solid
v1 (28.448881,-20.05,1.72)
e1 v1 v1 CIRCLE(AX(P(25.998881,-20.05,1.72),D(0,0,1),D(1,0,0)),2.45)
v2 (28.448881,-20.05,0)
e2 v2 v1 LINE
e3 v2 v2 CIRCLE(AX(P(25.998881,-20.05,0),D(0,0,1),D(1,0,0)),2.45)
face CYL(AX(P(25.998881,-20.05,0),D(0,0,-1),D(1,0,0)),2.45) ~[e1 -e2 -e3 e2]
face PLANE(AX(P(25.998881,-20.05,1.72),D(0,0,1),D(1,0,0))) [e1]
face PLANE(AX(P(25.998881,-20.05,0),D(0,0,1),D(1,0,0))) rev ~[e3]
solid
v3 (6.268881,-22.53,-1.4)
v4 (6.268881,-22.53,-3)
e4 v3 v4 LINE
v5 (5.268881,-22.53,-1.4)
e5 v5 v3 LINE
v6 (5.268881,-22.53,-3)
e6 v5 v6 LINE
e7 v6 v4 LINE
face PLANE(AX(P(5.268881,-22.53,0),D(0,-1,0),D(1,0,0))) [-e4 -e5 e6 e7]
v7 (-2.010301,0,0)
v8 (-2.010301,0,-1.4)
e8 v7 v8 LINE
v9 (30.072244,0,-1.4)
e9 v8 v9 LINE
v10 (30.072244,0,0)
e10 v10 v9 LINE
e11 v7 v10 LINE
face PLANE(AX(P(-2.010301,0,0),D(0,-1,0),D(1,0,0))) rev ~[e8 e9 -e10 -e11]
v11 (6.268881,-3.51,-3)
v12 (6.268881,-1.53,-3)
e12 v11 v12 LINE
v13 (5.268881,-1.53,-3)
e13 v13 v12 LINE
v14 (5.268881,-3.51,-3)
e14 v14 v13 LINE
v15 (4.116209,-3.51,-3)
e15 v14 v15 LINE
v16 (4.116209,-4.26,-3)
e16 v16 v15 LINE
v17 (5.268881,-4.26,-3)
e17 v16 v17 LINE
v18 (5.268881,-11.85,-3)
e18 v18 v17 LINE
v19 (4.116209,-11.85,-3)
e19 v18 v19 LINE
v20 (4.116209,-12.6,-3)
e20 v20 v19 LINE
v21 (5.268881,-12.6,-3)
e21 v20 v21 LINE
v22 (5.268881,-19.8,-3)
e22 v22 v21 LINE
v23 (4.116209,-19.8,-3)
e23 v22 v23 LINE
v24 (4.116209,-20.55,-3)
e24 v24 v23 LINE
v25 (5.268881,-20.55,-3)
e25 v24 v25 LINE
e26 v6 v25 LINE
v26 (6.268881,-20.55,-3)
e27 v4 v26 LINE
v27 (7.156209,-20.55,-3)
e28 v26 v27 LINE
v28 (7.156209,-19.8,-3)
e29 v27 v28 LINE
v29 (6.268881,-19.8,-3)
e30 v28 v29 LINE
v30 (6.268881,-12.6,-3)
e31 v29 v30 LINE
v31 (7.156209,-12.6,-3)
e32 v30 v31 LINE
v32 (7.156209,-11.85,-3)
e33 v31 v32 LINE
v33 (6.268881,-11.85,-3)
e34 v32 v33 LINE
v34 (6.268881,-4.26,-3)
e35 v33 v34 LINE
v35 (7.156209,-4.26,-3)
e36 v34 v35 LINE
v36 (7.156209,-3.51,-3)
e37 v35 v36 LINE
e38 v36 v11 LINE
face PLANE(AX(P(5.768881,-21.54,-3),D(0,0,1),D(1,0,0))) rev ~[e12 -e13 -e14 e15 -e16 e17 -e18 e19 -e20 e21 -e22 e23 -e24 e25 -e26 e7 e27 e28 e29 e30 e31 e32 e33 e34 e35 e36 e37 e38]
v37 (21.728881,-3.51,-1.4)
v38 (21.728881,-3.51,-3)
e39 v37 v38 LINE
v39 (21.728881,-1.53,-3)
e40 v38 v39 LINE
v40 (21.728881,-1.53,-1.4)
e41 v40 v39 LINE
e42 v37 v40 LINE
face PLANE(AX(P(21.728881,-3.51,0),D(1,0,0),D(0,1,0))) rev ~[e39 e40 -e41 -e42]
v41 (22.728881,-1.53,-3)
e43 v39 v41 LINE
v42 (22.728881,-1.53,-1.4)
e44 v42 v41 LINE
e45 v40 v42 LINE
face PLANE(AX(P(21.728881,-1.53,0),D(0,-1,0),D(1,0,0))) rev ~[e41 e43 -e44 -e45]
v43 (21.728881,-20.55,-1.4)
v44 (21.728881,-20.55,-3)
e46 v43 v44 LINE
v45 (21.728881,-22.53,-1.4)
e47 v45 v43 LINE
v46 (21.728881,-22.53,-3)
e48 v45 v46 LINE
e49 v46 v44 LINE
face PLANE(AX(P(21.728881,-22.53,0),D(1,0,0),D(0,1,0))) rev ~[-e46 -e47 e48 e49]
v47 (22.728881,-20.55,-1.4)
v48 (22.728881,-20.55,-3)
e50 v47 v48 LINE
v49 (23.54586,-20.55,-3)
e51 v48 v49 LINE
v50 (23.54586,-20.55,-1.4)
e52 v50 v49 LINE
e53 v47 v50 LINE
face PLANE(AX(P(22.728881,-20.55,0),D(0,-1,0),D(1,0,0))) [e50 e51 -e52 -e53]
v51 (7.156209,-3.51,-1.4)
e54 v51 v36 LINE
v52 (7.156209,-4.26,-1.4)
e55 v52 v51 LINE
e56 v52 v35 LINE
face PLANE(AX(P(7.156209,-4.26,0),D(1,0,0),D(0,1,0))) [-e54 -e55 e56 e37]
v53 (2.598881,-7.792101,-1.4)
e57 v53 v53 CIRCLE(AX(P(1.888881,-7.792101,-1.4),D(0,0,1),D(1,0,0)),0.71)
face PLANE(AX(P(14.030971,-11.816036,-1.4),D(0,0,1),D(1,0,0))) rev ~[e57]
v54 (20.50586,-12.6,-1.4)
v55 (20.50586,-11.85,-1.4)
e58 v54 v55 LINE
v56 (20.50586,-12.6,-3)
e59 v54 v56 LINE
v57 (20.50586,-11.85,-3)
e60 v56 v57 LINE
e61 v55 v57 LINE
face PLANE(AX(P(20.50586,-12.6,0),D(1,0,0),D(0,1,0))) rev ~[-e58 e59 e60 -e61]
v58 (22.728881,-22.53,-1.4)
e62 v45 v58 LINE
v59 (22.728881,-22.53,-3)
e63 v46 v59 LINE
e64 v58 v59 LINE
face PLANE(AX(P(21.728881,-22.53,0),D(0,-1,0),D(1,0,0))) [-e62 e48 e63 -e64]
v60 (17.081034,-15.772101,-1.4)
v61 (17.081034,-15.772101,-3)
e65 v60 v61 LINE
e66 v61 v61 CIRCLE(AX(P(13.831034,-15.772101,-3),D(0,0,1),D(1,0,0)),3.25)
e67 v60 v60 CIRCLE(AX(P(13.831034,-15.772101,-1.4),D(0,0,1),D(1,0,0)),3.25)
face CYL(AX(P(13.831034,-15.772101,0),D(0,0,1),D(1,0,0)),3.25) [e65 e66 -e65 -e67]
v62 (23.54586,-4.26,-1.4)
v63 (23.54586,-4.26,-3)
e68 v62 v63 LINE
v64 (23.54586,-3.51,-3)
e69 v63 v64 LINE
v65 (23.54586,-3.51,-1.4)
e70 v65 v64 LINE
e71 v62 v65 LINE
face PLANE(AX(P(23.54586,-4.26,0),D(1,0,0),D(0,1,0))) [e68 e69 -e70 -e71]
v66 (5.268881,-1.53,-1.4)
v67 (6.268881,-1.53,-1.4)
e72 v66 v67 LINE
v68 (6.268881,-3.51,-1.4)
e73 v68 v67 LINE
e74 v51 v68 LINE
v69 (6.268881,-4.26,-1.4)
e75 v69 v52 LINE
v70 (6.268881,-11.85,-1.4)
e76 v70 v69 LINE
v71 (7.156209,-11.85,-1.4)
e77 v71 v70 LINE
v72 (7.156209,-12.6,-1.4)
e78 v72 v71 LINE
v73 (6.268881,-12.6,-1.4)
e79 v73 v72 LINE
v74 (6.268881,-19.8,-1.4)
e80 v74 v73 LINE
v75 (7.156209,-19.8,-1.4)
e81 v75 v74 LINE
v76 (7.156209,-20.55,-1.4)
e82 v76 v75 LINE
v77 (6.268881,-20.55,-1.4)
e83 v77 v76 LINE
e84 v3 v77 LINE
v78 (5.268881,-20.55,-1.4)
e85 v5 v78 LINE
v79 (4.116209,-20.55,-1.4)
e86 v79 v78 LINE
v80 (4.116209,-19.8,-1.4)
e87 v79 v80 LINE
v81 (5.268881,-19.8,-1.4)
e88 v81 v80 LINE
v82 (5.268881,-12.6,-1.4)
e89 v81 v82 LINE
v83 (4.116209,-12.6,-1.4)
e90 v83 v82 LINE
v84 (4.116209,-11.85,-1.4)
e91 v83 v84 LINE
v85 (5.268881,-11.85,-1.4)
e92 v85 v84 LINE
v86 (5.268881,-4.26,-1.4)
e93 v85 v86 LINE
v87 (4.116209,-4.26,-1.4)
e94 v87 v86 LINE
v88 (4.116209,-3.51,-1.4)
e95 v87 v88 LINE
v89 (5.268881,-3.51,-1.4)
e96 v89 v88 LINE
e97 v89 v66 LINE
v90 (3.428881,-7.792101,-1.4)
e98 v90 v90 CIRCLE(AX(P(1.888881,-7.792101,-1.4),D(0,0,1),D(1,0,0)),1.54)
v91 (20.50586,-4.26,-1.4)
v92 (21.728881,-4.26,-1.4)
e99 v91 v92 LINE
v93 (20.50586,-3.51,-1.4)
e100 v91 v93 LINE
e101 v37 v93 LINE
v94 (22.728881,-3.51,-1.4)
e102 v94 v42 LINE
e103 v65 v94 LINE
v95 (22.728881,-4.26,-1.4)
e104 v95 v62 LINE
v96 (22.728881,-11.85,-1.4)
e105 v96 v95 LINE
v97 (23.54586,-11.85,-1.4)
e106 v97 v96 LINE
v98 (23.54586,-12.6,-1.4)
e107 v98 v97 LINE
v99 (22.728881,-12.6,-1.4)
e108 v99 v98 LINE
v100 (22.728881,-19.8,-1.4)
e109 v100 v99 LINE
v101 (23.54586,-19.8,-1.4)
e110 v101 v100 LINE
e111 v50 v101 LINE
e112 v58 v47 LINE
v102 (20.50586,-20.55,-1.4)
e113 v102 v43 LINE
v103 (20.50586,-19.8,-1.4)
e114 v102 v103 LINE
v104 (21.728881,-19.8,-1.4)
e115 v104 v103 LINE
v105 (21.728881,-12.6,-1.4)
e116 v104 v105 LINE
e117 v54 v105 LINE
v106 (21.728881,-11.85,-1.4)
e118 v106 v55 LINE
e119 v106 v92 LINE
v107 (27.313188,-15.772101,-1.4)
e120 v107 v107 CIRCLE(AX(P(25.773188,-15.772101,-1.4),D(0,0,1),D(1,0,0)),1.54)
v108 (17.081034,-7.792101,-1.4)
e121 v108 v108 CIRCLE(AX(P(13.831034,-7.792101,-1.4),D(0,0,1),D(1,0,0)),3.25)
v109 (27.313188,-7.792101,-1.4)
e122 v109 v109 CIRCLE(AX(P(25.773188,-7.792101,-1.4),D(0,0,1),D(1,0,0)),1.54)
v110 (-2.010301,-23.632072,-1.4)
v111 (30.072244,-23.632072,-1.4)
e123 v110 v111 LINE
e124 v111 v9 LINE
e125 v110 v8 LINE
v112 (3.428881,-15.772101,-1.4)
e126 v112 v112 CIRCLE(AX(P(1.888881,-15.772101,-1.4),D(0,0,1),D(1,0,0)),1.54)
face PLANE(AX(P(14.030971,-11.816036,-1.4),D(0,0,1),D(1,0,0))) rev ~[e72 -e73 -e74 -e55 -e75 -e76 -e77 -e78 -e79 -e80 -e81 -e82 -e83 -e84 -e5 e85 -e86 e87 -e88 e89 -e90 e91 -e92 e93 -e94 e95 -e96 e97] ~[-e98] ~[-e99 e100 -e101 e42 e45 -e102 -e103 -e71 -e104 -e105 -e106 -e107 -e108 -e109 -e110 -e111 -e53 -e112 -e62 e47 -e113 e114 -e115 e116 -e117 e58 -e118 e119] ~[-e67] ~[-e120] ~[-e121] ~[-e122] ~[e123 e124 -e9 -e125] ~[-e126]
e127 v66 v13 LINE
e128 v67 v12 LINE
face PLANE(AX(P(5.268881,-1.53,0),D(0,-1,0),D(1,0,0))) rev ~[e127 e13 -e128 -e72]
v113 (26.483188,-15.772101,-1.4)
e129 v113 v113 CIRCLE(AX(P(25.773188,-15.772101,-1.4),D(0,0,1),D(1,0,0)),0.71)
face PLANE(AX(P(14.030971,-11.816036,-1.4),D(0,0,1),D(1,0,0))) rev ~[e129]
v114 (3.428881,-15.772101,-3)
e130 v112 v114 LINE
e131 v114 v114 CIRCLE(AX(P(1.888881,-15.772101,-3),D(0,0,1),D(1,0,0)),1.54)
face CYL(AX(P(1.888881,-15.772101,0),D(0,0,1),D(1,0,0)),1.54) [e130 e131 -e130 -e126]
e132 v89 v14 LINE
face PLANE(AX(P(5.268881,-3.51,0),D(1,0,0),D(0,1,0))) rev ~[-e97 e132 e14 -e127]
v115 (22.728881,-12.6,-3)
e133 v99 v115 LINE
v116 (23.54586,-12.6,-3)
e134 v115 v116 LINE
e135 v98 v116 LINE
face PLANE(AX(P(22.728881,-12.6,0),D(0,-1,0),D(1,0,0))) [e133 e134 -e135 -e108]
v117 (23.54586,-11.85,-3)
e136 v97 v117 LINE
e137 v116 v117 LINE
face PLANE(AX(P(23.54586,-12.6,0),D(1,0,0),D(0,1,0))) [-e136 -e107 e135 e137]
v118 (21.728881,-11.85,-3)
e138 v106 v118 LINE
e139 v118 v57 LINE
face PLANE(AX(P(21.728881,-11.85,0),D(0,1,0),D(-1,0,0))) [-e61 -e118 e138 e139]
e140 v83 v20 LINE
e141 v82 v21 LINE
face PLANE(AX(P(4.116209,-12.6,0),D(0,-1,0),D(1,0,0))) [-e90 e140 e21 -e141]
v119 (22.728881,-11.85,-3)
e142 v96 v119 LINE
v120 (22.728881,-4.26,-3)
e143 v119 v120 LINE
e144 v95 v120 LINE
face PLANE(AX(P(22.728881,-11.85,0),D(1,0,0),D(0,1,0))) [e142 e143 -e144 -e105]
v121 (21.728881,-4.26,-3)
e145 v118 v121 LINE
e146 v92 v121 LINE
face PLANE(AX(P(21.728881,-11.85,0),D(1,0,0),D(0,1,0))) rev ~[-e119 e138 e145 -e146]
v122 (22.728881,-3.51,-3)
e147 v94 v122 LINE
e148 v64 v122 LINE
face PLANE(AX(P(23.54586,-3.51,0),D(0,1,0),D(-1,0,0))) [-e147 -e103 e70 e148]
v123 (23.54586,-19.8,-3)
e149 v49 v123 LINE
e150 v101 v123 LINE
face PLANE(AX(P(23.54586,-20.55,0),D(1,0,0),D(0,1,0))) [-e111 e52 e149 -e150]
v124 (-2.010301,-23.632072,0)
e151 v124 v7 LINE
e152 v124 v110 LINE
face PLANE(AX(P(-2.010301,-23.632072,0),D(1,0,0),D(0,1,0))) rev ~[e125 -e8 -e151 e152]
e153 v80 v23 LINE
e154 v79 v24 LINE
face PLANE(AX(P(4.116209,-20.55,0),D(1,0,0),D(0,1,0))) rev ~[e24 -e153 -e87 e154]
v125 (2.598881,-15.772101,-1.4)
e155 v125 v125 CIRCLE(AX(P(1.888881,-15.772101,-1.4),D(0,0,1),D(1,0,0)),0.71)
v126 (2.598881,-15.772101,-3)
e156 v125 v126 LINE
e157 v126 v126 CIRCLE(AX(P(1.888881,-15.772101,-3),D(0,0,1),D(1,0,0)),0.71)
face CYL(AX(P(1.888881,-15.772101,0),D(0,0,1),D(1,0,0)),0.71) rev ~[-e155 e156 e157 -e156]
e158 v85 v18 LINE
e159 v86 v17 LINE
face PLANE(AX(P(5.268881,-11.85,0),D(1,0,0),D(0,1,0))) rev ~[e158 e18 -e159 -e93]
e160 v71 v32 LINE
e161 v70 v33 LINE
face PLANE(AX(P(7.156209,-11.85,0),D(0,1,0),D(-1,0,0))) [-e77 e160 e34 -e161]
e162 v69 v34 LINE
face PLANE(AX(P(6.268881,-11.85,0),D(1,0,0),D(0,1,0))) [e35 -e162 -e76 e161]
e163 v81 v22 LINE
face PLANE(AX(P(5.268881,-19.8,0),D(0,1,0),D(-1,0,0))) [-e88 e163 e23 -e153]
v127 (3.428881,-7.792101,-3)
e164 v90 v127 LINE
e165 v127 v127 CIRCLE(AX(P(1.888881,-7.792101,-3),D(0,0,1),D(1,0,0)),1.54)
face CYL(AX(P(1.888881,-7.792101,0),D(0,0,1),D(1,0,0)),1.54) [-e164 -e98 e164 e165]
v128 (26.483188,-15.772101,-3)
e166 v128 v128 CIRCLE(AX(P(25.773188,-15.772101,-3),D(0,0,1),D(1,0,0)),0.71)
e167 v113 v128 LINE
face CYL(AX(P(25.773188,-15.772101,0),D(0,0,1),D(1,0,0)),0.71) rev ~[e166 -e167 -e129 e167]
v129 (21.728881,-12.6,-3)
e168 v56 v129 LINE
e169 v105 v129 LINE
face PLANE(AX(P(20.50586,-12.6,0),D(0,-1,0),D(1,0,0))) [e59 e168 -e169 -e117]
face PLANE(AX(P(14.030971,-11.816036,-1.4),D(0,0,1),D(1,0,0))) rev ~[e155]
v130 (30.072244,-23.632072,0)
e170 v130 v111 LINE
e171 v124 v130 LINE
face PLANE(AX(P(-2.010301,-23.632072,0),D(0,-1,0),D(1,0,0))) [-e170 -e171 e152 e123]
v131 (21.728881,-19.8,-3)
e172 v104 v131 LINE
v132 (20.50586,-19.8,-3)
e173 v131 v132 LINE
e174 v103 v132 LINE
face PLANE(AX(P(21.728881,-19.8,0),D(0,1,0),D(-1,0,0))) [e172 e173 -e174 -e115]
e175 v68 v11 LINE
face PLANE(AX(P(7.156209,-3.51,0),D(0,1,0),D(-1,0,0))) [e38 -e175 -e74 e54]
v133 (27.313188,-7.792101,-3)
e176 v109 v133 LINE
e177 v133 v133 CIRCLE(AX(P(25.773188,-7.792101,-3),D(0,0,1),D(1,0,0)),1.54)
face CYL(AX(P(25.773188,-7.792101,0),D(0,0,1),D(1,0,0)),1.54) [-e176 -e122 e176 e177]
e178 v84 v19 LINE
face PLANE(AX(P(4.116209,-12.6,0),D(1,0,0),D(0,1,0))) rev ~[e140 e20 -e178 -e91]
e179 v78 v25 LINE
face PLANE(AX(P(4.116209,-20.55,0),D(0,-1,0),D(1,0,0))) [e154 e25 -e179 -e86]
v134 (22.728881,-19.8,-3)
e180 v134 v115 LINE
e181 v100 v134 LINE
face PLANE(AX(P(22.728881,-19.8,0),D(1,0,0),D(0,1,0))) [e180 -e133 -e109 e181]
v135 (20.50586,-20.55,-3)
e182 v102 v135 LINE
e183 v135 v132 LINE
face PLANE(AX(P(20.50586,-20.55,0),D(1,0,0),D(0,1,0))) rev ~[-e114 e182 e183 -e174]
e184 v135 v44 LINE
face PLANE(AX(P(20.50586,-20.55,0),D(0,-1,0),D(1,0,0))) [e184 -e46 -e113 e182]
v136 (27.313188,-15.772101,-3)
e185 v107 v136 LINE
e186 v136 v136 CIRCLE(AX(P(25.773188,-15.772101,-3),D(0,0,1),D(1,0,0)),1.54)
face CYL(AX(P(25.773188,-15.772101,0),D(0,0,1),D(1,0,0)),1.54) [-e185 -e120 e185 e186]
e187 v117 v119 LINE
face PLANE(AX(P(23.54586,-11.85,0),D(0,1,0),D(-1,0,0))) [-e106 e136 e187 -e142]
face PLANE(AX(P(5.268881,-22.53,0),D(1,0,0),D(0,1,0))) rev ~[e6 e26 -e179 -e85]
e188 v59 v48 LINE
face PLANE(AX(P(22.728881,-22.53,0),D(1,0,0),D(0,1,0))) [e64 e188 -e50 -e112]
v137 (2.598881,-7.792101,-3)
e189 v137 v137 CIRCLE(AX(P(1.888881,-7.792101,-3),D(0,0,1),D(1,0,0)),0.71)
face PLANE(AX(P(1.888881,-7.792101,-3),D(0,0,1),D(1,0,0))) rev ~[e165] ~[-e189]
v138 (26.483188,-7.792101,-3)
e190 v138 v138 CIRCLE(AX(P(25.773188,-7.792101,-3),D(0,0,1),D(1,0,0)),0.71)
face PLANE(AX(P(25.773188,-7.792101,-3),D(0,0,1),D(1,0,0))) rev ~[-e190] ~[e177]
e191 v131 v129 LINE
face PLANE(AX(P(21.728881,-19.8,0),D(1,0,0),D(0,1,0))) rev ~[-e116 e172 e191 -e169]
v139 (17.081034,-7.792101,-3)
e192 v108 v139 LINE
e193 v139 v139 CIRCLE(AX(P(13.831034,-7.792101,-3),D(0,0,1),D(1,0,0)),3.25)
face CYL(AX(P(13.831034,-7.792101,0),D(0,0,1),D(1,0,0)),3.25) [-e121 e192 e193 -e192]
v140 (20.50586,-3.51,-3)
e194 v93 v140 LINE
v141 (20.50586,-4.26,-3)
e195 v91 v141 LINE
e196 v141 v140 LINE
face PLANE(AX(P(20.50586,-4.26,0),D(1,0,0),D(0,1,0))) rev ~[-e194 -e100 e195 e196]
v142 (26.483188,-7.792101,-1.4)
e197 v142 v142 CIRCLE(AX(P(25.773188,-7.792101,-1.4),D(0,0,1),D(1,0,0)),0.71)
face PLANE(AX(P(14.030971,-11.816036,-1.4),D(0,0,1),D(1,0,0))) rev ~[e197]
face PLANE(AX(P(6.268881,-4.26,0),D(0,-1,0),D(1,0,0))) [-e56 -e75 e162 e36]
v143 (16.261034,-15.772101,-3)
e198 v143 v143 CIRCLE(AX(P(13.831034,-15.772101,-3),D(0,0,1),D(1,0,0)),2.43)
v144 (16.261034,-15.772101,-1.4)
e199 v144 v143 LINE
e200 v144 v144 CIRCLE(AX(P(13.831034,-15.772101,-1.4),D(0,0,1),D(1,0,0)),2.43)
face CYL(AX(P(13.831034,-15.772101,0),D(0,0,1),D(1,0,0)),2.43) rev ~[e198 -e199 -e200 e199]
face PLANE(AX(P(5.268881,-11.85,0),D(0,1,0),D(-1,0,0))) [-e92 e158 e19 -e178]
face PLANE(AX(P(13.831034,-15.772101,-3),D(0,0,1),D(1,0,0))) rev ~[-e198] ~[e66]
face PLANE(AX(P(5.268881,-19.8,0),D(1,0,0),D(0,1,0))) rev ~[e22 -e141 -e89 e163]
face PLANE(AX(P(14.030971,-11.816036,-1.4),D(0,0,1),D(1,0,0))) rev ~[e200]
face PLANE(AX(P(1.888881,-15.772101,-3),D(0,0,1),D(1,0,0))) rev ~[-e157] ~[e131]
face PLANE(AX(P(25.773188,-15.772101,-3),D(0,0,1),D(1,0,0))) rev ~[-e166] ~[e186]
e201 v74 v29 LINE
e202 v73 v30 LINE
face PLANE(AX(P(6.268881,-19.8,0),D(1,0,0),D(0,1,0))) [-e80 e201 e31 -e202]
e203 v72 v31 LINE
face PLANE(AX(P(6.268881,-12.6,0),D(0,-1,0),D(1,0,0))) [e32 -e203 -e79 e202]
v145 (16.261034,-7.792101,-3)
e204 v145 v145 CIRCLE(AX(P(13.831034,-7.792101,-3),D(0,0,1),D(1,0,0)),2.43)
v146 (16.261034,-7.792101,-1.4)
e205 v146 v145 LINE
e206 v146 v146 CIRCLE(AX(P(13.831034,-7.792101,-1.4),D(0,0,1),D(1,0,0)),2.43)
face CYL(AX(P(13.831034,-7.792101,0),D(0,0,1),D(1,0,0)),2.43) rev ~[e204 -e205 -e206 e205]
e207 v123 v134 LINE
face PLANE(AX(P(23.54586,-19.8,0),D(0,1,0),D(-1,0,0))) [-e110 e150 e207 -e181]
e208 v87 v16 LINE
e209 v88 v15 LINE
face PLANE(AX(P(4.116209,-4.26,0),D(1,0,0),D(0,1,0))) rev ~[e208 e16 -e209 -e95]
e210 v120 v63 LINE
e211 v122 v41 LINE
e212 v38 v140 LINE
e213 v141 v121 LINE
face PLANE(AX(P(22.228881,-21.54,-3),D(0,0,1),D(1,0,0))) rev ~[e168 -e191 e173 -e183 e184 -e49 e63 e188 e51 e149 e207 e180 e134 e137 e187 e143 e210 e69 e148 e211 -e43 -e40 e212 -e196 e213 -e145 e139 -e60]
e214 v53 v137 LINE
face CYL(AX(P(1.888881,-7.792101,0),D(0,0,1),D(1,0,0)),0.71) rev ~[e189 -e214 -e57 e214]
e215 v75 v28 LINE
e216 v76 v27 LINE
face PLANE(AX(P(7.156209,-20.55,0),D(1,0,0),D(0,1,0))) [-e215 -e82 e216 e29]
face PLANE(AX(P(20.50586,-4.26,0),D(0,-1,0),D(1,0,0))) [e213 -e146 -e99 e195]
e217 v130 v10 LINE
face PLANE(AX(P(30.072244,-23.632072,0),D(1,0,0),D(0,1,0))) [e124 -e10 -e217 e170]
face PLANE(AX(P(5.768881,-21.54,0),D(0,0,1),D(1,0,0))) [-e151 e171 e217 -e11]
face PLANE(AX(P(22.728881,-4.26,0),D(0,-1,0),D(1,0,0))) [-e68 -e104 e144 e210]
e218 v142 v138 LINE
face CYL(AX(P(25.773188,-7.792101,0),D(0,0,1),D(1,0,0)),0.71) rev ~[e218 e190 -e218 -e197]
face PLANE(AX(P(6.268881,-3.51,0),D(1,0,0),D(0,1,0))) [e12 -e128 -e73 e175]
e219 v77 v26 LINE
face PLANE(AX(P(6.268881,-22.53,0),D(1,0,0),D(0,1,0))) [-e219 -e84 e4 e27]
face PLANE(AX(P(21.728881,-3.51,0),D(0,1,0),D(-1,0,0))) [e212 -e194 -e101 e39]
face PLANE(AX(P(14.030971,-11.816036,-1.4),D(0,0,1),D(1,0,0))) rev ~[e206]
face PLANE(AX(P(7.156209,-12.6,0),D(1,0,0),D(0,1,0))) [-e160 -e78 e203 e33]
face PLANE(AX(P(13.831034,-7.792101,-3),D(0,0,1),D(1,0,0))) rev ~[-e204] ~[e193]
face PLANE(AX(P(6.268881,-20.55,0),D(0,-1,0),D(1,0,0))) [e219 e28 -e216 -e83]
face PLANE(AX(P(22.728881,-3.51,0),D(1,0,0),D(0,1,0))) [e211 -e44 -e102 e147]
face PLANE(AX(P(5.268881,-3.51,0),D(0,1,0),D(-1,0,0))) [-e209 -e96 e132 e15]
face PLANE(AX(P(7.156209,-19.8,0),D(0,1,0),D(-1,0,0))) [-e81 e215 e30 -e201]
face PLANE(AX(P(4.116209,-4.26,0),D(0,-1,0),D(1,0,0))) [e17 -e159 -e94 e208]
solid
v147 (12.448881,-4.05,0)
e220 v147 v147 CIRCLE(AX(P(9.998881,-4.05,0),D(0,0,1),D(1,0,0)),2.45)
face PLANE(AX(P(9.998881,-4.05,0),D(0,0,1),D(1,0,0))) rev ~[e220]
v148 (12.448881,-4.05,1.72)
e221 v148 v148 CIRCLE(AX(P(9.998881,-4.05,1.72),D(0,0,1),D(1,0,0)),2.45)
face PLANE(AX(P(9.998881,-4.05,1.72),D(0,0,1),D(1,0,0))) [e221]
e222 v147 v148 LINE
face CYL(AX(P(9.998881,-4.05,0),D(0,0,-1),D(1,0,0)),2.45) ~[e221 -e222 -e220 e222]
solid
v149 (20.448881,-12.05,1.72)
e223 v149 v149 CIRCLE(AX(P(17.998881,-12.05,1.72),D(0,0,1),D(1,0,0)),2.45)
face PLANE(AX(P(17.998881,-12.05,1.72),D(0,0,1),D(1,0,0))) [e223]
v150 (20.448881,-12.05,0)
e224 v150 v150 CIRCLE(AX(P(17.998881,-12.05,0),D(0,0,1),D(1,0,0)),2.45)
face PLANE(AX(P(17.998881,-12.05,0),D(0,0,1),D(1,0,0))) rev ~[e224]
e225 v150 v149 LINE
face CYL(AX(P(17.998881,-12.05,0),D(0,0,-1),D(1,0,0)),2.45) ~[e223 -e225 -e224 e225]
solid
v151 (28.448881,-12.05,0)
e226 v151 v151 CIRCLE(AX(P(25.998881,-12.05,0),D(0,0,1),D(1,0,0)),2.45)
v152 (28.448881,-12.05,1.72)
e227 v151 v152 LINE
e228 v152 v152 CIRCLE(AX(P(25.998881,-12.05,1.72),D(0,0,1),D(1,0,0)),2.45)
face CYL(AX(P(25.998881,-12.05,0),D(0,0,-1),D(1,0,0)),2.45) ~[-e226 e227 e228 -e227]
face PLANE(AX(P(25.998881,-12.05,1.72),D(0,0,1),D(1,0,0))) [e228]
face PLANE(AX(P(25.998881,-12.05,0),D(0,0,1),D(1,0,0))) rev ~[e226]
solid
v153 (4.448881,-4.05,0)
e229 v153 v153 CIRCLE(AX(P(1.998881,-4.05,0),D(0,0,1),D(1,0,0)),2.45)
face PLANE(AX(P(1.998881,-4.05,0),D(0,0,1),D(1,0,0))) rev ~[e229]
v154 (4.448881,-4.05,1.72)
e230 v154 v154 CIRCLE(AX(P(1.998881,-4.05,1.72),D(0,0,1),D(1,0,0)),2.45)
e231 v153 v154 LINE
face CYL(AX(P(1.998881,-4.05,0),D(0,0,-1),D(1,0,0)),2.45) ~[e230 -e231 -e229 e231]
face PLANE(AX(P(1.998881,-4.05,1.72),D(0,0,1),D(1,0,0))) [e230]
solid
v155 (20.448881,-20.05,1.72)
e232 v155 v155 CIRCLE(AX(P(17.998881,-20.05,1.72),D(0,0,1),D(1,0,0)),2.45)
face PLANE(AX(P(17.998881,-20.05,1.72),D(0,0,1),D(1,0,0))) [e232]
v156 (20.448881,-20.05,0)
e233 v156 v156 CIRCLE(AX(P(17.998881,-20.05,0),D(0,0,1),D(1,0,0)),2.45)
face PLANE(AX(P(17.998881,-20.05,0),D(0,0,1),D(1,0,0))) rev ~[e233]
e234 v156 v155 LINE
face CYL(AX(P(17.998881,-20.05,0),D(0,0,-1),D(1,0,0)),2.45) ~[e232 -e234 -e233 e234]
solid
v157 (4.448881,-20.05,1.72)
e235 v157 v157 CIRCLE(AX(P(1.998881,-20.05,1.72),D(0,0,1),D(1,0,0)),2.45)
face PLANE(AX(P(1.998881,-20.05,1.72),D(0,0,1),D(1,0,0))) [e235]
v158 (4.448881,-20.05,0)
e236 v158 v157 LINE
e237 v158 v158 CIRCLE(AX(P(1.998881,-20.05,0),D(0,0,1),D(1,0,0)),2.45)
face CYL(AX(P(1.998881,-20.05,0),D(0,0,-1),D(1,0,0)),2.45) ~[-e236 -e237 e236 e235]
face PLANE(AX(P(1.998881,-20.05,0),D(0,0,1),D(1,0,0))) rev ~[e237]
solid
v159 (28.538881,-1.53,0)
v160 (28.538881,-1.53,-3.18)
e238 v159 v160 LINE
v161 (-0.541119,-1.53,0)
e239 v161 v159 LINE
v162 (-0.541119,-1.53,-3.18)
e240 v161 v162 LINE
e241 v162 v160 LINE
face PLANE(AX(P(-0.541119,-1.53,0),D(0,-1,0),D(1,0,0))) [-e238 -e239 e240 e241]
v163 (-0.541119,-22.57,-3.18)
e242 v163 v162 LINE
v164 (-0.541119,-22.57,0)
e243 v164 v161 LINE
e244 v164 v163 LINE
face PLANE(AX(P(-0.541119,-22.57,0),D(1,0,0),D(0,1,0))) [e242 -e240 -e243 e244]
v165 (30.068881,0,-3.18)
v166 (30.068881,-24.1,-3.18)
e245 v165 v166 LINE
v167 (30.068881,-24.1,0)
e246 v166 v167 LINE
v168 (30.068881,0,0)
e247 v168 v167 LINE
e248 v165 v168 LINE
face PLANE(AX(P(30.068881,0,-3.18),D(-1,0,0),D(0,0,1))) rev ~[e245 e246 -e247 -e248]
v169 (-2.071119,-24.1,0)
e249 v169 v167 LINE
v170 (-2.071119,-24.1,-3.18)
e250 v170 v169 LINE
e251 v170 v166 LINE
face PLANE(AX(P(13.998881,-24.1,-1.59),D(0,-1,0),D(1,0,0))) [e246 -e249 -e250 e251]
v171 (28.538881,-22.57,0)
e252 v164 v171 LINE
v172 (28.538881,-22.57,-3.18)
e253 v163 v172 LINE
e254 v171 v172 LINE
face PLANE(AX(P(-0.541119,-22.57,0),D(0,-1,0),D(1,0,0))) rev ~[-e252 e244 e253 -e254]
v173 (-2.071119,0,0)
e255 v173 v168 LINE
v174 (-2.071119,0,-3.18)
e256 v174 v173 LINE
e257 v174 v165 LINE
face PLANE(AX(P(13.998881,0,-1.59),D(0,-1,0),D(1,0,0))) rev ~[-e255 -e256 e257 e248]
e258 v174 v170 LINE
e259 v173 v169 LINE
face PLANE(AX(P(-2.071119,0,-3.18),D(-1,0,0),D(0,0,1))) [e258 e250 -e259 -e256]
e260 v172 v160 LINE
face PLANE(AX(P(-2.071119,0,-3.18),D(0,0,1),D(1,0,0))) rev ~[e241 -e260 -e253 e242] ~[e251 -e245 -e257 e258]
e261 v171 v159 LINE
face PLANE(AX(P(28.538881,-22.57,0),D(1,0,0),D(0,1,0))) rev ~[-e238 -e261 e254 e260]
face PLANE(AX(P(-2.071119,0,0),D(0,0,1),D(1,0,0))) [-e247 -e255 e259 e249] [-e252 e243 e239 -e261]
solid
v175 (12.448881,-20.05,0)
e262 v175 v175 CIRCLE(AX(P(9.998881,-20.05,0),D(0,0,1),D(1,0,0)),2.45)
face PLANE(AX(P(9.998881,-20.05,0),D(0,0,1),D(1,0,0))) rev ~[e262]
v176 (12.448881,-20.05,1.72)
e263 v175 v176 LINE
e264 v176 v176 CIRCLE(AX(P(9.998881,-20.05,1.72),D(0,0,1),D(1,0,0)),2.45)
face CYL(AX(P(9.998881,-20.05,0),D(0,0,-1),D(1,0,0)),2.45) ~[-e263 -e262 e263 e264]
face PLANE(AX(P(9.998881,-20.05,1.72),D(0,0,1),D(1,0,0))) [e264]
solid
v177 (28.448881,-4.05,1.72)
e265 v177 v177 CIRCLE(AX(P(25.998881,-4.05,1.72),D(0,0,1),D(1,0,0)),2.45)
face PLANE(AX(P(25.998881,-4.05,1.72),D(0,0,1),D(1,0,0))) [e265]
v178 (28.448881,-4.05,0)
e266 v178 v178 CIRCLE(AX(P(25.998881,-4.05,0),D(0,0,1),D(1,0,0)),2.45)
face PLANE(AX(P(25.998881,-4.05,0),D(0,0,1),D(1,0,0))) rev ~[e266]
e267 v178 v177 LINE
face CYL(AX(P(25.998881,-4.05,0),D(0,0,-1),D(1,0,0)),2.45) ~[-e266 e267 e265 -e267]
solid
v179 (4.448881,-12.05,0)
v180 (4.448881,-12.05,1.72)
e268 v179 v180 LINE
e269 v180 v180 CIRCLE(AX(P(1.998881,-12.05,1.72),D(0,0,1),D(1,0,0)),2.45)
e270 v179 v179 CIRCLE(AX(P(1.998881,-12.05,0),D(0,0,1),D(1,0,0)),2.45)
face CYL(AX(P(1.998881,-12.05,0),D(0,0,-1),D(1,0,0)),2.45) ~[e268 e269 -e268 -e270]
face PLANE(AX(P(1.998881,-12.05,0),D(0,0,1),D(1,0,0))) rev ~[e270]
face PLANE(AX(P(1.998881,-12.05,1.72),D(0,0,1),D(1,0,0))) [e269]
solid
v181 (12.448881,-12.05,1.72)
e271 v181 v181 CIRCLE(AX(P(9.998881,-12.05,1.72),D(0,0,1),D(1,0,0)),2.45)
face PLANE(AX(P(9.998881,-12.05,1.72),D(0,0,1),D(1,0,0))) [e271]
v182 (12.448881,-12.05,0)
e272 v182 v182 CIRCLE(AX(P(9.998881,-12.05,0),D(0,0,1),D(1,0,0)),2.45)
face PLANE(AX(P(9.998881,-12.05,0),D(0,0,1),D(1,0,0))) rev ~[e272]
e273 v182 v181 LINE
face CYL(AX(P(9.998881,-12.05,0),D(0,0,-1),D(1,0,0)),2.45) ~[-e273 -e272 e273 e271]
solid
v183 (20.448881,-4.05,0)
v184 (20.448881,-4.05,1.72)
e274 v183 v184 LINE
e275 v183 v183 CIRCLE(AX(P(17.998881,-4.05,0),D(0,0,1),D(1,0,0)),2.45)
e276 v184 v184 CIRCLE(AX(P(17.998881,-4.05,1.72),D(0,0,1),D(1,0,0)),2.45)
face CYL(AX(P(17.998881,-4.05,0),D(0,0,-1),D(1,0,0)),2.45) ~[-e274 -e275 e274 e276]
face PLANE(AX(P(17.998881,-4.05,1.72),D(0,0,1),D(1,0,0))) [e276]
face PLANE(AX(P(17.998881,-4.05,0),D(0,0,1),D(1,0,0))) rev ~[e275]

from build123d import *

# Parameters (mm, degrees)
F0_W     = 32.14
F0_H     = 3.18
F1_DEPTH = 24.1
F2_R     = 2.45
F3_DEPTH = 1.72
F4_W     = 29.08
F4_H     = 21.04
F5_DEPTH = 3.5
F6_W     = 32.0825448725
F6_H     = 23.6320719123
F7_DEPTH = 1.4
F8_W     = 1
F8_H     = 1.98
F8_W_2   = 1.152671826
F8_H_2   = 0.75
F8_W_3   = 0.887328174
F8_H_3   = 7.2
F8_H_4   = 7.59
F8_W_4   = 1.223020737
F8_W_5   = 0.816979263
F8_R     = 1.54
F8_R_2   = 0.71
F8_R_3   = 3.25
F8_R_4   = 2.43
F9_DEPTH = 3


with BuildPart() as f1:
    # F0 (on Front) → F1 (new body)
    with BuildSketch(Plane.XZ):
        with Locations((13.9988805842, -1.59)):
            Rectangle(F0_W, F0_H)
    extrude(amount=F1_DEPTH)

    # F4 (on Top) → F5 (cut)
    with BuildSketch(Plane.XY):
        with Locations((13.9988805842, -12.05)):
            Rectangle(F4_W, F4_H)
    extrude(amount=-F5_DEPTH, mode=Mode.SUBTRACT)


with BuildPart() as f3:
    # F2 (on Top) → F3 (new body)
    with BuildSketch(Plane.XY):
        with Locations((1.9988805842, -4.05)):
            Circle(F2_R)
    extrude(amount=F3_DEPTH)


with BuildPart() as f3b:
    # F2 (on Top) → F3, piece 2 (new body)
    with BuildSketch(Plane.XY):
        with Locations((9.9988805842, -4.05)):
            Circle(F2_R)
    extrude(amount=F3_DEPTH)


with BuildPart() as f3c:
    # F2 (on Top) → F3, piece 3 (new body)
    with BuildSketch(Plane.XY):
        with Locations((17.9988805842, -4.05)):
            Circle(F2_R)
    extrude(amount=F3_DEPTH)


with BuildPart() as f3d:
    # F2 (on Top) → F3, piece 4 (new body)
    with BuildSketch(Plane.XY):
        with Locations((25.9988805842, -4.05)):
            Circle(F2_R)
    extrude(amount=F3_DEPTH)


with BuildPart() as f3e:
    # F2 (on Top) → F3, piece 5 (new body)
    with BuildSketch(Plane.XY):
        with Locations((25.9988805842, -12.05)):
            Circle(F2_R)
    extrude(amount=F3_DEPTH)


with BuildPart() as f3f:
    # F2 (on Top) → F3, piece 6 (new body)
    with BuildSketch(Plane.XY):
        with Locations((25.9988805842, -20.05)):
            Circle(F2_R)
    extrude(amount=F3_DEPTH)


with BuildPart() as f3g:
    # F2 (on Top) → F3, piece 7 (new body)
    with BuildSketch(Plane.XY):
        with Locations((17.9988805842, -12.05)):
            Circle(F2_R)
    extrude(amount=F3_DEPTH)


with BuildPart() as f3h:
    # F2 (on Top) → F3, piece 8 (new body)
    with BuildSketch(Plane.XY):
        with Locations((17.9988805842, -20.05)):
            Circle(F2_R)
    extrude(amount=F3_DEPTH)


with BuildPart() as f3i:
    # F2 (on Top) → F3, piece 9 (new body)
    with BuildSketch(Plane.XY):
        with Locations((9.9988805842, -12.05)):
            Circle(F2_R)
    extrude(amount=F3_DEPTH)


with BuildPart() as f3j:
    # F2 (on Top) → F3, piece 10 (new body)
    with BuildSketch(Plane.XY):
        with Locations((9.9988805842, -20.05)):
            Circle(F2_R)
    extrude(amount=F3_DEPTH)


with BuildPart() as f3k:
    # F2 (on Top) → F3, piece 11 (new body)
    with BuildSketch(Plane.XY):
        with Locations((1.9988805842, -12.05)):
            Circle(F2_R)
    extrude(amount=F3_DEPTH)


with BuildPart() as f3l:
    # F2 (on Top) → F3, piece 12 (new body)
    with BuildSketch(Plane.XY):
        with Locations((1.9988805842, -20.05)):
            Circle(F2_R)
    extrude(amount=F3_DEPTH)


with BuildPart() as f7:
    # F6 (on Top) → F7 (new body)
    with BuildSketch(Plane.XY):
        with Locations((14.0309714479, -11.8160359561)):
            Rectangle(F6_W, F6_H)
    extrude(amount=-F7_DEPTH)

    # F8 (on Top) → F9 (join)
    with BuildSketch(Plane.XY):
        with Locations((5.7688805842, -21.54)):
            Rectangle(F8_W, F8_H)
        with Locations((4.6925446712, -20.175)):
            Rectangle(F8_W_2, F8_H_2)
        with Locations((5.7688805842, -20.175)):
            Rectangle(F8_W, F8_H_2)
        with Locations((6.7125446712, -20.175)):
            Rectangle(F8_W_3, F8_H_2)
        with Locations((5.7688805842, -16.2)):
            Rectangle(F8_W, F8_H_3)
        with Locations((4.6925446712, -12.225)):
            Rectangle(F8_W_2, F8_H_2)
        with Locations((5.7688805842, -12.225)):
            Rectangle(F8_W, F8_H_2)
        with Locations((6.7125446712, -12.225)):
            Rectangle(F8_W_3, F8_H_2)
        with Locations((5.7688805842, -8.055)):
            Rectangle(F8_W, F8_H_4)
        with Locations((4.6925446712, -3.885)):
            Rectangle(F8_W_2, F8_H_2)
        with Locations((5.7688805842, -3.885)):
            Rectangle(F8_W, F8_H_2)
        with Locations((6.7125446712, -3.885)):
            Rectangle(F8_W_3, F8_H_2)
        with Locations((5.7688805842, -2.52)):
            Rectangle(F8_W, F8_H)
        with Locations((22.2288805842, -21.54)):
            Rectangle(F8_W, F8_H)
        with Locations((21.1173702157, -20.175)):
            Rectangle(F8_W_4, F8_H_2)
        with Locations((22.2288805842, -20.175)):
            Rectangle(F8_W, F8_H_2)
        with Locations((23.1373702157, -20.175)):
            Rectangle(F8_W_5, F8_H_2)
        with Locations((22.2288805842, -16.2)):
            Rectangle(F8_W, F8_H_3)
        with Locations((21.1173702157, -12.225)):
            Rectangle(F8_W_4, F8_H_2)
        with Locations((22.2288805842, -12.225)):
            Rectangle(F8_W, F8_H_2)
        with Locations((23.1373702157, -12.225)):
            Rectangle(F8_W_5, F8_H_2)
        with Locations((22.2288805842, -8.055)):
            Rectangle(F8_W, F8_H_4)
        with Locations((21.1173702157, -3.885)):
            Rectangle(F8_W_4, F8_H_2)
        with Locations((22.2288805842, -3.885)):
            Rectangle(F8_W, F8_H_2)
        with Locations((23.1373702157, -3.885)):
            Rectangle(F8_W_5, F8_H_2)
        with Locations((22.2288805842, -2.52)):
            Rectangle(F8_W, F8_H)
        with Locations((1.8888805842, -7.792100538)):
            Circle(F8_R)
        with Locations((1.8888805842, -7.792100538)):
            Circle(F8_R_2, mode=Mode.SUBTRACT)
        with Locations((1.8888805842, -15.772100538)):
            Circle(F8_R)
        with Locations((1.8888805842, -15.772100538)):
            Circle(F8_R_2, mode=Mode.SUBTRACT)
        with Locations((25.7731880212, -15.772100538)):
            Circle(F8_R)
        with Locations((25.7731880212, -15.772100538)):
            Circle(F8_R_2, mode=Mode.SUBTRACT)
        with Locations((25.7731880212, -7.792100538)):
            Circle(F8_R)
        with Locations((25.7731880212, -7.792100538)):
            Circle(F8_R_2, mode=Mode.SUBTRACT)
        with Locations((13.8310343027, -15.772100538)):
            Circle(F8_R_3)
        with Locations((13.8310343027, -15.772100538)):
            Circle(F8_R_4, mode=Mode.SUBTRACT)
        with Locations((13.8310343027, -7.792100538)):
            Circle(F8_R_3)
        with Locations((13.8310343027, -7.792100538)):
            Circle(F8_R_4, mode=Mode.SUBTRACT)
    extrude(amount=-F9_DEPTH)


solid = Compound([f1.part, f3.part, f3b.part, f3c.part, f3d.part, f3e.part, f3f.part, f3g.part, f3h.part, f3i.part, f3j.part, f3k.part, f3l.part, f7.part])
